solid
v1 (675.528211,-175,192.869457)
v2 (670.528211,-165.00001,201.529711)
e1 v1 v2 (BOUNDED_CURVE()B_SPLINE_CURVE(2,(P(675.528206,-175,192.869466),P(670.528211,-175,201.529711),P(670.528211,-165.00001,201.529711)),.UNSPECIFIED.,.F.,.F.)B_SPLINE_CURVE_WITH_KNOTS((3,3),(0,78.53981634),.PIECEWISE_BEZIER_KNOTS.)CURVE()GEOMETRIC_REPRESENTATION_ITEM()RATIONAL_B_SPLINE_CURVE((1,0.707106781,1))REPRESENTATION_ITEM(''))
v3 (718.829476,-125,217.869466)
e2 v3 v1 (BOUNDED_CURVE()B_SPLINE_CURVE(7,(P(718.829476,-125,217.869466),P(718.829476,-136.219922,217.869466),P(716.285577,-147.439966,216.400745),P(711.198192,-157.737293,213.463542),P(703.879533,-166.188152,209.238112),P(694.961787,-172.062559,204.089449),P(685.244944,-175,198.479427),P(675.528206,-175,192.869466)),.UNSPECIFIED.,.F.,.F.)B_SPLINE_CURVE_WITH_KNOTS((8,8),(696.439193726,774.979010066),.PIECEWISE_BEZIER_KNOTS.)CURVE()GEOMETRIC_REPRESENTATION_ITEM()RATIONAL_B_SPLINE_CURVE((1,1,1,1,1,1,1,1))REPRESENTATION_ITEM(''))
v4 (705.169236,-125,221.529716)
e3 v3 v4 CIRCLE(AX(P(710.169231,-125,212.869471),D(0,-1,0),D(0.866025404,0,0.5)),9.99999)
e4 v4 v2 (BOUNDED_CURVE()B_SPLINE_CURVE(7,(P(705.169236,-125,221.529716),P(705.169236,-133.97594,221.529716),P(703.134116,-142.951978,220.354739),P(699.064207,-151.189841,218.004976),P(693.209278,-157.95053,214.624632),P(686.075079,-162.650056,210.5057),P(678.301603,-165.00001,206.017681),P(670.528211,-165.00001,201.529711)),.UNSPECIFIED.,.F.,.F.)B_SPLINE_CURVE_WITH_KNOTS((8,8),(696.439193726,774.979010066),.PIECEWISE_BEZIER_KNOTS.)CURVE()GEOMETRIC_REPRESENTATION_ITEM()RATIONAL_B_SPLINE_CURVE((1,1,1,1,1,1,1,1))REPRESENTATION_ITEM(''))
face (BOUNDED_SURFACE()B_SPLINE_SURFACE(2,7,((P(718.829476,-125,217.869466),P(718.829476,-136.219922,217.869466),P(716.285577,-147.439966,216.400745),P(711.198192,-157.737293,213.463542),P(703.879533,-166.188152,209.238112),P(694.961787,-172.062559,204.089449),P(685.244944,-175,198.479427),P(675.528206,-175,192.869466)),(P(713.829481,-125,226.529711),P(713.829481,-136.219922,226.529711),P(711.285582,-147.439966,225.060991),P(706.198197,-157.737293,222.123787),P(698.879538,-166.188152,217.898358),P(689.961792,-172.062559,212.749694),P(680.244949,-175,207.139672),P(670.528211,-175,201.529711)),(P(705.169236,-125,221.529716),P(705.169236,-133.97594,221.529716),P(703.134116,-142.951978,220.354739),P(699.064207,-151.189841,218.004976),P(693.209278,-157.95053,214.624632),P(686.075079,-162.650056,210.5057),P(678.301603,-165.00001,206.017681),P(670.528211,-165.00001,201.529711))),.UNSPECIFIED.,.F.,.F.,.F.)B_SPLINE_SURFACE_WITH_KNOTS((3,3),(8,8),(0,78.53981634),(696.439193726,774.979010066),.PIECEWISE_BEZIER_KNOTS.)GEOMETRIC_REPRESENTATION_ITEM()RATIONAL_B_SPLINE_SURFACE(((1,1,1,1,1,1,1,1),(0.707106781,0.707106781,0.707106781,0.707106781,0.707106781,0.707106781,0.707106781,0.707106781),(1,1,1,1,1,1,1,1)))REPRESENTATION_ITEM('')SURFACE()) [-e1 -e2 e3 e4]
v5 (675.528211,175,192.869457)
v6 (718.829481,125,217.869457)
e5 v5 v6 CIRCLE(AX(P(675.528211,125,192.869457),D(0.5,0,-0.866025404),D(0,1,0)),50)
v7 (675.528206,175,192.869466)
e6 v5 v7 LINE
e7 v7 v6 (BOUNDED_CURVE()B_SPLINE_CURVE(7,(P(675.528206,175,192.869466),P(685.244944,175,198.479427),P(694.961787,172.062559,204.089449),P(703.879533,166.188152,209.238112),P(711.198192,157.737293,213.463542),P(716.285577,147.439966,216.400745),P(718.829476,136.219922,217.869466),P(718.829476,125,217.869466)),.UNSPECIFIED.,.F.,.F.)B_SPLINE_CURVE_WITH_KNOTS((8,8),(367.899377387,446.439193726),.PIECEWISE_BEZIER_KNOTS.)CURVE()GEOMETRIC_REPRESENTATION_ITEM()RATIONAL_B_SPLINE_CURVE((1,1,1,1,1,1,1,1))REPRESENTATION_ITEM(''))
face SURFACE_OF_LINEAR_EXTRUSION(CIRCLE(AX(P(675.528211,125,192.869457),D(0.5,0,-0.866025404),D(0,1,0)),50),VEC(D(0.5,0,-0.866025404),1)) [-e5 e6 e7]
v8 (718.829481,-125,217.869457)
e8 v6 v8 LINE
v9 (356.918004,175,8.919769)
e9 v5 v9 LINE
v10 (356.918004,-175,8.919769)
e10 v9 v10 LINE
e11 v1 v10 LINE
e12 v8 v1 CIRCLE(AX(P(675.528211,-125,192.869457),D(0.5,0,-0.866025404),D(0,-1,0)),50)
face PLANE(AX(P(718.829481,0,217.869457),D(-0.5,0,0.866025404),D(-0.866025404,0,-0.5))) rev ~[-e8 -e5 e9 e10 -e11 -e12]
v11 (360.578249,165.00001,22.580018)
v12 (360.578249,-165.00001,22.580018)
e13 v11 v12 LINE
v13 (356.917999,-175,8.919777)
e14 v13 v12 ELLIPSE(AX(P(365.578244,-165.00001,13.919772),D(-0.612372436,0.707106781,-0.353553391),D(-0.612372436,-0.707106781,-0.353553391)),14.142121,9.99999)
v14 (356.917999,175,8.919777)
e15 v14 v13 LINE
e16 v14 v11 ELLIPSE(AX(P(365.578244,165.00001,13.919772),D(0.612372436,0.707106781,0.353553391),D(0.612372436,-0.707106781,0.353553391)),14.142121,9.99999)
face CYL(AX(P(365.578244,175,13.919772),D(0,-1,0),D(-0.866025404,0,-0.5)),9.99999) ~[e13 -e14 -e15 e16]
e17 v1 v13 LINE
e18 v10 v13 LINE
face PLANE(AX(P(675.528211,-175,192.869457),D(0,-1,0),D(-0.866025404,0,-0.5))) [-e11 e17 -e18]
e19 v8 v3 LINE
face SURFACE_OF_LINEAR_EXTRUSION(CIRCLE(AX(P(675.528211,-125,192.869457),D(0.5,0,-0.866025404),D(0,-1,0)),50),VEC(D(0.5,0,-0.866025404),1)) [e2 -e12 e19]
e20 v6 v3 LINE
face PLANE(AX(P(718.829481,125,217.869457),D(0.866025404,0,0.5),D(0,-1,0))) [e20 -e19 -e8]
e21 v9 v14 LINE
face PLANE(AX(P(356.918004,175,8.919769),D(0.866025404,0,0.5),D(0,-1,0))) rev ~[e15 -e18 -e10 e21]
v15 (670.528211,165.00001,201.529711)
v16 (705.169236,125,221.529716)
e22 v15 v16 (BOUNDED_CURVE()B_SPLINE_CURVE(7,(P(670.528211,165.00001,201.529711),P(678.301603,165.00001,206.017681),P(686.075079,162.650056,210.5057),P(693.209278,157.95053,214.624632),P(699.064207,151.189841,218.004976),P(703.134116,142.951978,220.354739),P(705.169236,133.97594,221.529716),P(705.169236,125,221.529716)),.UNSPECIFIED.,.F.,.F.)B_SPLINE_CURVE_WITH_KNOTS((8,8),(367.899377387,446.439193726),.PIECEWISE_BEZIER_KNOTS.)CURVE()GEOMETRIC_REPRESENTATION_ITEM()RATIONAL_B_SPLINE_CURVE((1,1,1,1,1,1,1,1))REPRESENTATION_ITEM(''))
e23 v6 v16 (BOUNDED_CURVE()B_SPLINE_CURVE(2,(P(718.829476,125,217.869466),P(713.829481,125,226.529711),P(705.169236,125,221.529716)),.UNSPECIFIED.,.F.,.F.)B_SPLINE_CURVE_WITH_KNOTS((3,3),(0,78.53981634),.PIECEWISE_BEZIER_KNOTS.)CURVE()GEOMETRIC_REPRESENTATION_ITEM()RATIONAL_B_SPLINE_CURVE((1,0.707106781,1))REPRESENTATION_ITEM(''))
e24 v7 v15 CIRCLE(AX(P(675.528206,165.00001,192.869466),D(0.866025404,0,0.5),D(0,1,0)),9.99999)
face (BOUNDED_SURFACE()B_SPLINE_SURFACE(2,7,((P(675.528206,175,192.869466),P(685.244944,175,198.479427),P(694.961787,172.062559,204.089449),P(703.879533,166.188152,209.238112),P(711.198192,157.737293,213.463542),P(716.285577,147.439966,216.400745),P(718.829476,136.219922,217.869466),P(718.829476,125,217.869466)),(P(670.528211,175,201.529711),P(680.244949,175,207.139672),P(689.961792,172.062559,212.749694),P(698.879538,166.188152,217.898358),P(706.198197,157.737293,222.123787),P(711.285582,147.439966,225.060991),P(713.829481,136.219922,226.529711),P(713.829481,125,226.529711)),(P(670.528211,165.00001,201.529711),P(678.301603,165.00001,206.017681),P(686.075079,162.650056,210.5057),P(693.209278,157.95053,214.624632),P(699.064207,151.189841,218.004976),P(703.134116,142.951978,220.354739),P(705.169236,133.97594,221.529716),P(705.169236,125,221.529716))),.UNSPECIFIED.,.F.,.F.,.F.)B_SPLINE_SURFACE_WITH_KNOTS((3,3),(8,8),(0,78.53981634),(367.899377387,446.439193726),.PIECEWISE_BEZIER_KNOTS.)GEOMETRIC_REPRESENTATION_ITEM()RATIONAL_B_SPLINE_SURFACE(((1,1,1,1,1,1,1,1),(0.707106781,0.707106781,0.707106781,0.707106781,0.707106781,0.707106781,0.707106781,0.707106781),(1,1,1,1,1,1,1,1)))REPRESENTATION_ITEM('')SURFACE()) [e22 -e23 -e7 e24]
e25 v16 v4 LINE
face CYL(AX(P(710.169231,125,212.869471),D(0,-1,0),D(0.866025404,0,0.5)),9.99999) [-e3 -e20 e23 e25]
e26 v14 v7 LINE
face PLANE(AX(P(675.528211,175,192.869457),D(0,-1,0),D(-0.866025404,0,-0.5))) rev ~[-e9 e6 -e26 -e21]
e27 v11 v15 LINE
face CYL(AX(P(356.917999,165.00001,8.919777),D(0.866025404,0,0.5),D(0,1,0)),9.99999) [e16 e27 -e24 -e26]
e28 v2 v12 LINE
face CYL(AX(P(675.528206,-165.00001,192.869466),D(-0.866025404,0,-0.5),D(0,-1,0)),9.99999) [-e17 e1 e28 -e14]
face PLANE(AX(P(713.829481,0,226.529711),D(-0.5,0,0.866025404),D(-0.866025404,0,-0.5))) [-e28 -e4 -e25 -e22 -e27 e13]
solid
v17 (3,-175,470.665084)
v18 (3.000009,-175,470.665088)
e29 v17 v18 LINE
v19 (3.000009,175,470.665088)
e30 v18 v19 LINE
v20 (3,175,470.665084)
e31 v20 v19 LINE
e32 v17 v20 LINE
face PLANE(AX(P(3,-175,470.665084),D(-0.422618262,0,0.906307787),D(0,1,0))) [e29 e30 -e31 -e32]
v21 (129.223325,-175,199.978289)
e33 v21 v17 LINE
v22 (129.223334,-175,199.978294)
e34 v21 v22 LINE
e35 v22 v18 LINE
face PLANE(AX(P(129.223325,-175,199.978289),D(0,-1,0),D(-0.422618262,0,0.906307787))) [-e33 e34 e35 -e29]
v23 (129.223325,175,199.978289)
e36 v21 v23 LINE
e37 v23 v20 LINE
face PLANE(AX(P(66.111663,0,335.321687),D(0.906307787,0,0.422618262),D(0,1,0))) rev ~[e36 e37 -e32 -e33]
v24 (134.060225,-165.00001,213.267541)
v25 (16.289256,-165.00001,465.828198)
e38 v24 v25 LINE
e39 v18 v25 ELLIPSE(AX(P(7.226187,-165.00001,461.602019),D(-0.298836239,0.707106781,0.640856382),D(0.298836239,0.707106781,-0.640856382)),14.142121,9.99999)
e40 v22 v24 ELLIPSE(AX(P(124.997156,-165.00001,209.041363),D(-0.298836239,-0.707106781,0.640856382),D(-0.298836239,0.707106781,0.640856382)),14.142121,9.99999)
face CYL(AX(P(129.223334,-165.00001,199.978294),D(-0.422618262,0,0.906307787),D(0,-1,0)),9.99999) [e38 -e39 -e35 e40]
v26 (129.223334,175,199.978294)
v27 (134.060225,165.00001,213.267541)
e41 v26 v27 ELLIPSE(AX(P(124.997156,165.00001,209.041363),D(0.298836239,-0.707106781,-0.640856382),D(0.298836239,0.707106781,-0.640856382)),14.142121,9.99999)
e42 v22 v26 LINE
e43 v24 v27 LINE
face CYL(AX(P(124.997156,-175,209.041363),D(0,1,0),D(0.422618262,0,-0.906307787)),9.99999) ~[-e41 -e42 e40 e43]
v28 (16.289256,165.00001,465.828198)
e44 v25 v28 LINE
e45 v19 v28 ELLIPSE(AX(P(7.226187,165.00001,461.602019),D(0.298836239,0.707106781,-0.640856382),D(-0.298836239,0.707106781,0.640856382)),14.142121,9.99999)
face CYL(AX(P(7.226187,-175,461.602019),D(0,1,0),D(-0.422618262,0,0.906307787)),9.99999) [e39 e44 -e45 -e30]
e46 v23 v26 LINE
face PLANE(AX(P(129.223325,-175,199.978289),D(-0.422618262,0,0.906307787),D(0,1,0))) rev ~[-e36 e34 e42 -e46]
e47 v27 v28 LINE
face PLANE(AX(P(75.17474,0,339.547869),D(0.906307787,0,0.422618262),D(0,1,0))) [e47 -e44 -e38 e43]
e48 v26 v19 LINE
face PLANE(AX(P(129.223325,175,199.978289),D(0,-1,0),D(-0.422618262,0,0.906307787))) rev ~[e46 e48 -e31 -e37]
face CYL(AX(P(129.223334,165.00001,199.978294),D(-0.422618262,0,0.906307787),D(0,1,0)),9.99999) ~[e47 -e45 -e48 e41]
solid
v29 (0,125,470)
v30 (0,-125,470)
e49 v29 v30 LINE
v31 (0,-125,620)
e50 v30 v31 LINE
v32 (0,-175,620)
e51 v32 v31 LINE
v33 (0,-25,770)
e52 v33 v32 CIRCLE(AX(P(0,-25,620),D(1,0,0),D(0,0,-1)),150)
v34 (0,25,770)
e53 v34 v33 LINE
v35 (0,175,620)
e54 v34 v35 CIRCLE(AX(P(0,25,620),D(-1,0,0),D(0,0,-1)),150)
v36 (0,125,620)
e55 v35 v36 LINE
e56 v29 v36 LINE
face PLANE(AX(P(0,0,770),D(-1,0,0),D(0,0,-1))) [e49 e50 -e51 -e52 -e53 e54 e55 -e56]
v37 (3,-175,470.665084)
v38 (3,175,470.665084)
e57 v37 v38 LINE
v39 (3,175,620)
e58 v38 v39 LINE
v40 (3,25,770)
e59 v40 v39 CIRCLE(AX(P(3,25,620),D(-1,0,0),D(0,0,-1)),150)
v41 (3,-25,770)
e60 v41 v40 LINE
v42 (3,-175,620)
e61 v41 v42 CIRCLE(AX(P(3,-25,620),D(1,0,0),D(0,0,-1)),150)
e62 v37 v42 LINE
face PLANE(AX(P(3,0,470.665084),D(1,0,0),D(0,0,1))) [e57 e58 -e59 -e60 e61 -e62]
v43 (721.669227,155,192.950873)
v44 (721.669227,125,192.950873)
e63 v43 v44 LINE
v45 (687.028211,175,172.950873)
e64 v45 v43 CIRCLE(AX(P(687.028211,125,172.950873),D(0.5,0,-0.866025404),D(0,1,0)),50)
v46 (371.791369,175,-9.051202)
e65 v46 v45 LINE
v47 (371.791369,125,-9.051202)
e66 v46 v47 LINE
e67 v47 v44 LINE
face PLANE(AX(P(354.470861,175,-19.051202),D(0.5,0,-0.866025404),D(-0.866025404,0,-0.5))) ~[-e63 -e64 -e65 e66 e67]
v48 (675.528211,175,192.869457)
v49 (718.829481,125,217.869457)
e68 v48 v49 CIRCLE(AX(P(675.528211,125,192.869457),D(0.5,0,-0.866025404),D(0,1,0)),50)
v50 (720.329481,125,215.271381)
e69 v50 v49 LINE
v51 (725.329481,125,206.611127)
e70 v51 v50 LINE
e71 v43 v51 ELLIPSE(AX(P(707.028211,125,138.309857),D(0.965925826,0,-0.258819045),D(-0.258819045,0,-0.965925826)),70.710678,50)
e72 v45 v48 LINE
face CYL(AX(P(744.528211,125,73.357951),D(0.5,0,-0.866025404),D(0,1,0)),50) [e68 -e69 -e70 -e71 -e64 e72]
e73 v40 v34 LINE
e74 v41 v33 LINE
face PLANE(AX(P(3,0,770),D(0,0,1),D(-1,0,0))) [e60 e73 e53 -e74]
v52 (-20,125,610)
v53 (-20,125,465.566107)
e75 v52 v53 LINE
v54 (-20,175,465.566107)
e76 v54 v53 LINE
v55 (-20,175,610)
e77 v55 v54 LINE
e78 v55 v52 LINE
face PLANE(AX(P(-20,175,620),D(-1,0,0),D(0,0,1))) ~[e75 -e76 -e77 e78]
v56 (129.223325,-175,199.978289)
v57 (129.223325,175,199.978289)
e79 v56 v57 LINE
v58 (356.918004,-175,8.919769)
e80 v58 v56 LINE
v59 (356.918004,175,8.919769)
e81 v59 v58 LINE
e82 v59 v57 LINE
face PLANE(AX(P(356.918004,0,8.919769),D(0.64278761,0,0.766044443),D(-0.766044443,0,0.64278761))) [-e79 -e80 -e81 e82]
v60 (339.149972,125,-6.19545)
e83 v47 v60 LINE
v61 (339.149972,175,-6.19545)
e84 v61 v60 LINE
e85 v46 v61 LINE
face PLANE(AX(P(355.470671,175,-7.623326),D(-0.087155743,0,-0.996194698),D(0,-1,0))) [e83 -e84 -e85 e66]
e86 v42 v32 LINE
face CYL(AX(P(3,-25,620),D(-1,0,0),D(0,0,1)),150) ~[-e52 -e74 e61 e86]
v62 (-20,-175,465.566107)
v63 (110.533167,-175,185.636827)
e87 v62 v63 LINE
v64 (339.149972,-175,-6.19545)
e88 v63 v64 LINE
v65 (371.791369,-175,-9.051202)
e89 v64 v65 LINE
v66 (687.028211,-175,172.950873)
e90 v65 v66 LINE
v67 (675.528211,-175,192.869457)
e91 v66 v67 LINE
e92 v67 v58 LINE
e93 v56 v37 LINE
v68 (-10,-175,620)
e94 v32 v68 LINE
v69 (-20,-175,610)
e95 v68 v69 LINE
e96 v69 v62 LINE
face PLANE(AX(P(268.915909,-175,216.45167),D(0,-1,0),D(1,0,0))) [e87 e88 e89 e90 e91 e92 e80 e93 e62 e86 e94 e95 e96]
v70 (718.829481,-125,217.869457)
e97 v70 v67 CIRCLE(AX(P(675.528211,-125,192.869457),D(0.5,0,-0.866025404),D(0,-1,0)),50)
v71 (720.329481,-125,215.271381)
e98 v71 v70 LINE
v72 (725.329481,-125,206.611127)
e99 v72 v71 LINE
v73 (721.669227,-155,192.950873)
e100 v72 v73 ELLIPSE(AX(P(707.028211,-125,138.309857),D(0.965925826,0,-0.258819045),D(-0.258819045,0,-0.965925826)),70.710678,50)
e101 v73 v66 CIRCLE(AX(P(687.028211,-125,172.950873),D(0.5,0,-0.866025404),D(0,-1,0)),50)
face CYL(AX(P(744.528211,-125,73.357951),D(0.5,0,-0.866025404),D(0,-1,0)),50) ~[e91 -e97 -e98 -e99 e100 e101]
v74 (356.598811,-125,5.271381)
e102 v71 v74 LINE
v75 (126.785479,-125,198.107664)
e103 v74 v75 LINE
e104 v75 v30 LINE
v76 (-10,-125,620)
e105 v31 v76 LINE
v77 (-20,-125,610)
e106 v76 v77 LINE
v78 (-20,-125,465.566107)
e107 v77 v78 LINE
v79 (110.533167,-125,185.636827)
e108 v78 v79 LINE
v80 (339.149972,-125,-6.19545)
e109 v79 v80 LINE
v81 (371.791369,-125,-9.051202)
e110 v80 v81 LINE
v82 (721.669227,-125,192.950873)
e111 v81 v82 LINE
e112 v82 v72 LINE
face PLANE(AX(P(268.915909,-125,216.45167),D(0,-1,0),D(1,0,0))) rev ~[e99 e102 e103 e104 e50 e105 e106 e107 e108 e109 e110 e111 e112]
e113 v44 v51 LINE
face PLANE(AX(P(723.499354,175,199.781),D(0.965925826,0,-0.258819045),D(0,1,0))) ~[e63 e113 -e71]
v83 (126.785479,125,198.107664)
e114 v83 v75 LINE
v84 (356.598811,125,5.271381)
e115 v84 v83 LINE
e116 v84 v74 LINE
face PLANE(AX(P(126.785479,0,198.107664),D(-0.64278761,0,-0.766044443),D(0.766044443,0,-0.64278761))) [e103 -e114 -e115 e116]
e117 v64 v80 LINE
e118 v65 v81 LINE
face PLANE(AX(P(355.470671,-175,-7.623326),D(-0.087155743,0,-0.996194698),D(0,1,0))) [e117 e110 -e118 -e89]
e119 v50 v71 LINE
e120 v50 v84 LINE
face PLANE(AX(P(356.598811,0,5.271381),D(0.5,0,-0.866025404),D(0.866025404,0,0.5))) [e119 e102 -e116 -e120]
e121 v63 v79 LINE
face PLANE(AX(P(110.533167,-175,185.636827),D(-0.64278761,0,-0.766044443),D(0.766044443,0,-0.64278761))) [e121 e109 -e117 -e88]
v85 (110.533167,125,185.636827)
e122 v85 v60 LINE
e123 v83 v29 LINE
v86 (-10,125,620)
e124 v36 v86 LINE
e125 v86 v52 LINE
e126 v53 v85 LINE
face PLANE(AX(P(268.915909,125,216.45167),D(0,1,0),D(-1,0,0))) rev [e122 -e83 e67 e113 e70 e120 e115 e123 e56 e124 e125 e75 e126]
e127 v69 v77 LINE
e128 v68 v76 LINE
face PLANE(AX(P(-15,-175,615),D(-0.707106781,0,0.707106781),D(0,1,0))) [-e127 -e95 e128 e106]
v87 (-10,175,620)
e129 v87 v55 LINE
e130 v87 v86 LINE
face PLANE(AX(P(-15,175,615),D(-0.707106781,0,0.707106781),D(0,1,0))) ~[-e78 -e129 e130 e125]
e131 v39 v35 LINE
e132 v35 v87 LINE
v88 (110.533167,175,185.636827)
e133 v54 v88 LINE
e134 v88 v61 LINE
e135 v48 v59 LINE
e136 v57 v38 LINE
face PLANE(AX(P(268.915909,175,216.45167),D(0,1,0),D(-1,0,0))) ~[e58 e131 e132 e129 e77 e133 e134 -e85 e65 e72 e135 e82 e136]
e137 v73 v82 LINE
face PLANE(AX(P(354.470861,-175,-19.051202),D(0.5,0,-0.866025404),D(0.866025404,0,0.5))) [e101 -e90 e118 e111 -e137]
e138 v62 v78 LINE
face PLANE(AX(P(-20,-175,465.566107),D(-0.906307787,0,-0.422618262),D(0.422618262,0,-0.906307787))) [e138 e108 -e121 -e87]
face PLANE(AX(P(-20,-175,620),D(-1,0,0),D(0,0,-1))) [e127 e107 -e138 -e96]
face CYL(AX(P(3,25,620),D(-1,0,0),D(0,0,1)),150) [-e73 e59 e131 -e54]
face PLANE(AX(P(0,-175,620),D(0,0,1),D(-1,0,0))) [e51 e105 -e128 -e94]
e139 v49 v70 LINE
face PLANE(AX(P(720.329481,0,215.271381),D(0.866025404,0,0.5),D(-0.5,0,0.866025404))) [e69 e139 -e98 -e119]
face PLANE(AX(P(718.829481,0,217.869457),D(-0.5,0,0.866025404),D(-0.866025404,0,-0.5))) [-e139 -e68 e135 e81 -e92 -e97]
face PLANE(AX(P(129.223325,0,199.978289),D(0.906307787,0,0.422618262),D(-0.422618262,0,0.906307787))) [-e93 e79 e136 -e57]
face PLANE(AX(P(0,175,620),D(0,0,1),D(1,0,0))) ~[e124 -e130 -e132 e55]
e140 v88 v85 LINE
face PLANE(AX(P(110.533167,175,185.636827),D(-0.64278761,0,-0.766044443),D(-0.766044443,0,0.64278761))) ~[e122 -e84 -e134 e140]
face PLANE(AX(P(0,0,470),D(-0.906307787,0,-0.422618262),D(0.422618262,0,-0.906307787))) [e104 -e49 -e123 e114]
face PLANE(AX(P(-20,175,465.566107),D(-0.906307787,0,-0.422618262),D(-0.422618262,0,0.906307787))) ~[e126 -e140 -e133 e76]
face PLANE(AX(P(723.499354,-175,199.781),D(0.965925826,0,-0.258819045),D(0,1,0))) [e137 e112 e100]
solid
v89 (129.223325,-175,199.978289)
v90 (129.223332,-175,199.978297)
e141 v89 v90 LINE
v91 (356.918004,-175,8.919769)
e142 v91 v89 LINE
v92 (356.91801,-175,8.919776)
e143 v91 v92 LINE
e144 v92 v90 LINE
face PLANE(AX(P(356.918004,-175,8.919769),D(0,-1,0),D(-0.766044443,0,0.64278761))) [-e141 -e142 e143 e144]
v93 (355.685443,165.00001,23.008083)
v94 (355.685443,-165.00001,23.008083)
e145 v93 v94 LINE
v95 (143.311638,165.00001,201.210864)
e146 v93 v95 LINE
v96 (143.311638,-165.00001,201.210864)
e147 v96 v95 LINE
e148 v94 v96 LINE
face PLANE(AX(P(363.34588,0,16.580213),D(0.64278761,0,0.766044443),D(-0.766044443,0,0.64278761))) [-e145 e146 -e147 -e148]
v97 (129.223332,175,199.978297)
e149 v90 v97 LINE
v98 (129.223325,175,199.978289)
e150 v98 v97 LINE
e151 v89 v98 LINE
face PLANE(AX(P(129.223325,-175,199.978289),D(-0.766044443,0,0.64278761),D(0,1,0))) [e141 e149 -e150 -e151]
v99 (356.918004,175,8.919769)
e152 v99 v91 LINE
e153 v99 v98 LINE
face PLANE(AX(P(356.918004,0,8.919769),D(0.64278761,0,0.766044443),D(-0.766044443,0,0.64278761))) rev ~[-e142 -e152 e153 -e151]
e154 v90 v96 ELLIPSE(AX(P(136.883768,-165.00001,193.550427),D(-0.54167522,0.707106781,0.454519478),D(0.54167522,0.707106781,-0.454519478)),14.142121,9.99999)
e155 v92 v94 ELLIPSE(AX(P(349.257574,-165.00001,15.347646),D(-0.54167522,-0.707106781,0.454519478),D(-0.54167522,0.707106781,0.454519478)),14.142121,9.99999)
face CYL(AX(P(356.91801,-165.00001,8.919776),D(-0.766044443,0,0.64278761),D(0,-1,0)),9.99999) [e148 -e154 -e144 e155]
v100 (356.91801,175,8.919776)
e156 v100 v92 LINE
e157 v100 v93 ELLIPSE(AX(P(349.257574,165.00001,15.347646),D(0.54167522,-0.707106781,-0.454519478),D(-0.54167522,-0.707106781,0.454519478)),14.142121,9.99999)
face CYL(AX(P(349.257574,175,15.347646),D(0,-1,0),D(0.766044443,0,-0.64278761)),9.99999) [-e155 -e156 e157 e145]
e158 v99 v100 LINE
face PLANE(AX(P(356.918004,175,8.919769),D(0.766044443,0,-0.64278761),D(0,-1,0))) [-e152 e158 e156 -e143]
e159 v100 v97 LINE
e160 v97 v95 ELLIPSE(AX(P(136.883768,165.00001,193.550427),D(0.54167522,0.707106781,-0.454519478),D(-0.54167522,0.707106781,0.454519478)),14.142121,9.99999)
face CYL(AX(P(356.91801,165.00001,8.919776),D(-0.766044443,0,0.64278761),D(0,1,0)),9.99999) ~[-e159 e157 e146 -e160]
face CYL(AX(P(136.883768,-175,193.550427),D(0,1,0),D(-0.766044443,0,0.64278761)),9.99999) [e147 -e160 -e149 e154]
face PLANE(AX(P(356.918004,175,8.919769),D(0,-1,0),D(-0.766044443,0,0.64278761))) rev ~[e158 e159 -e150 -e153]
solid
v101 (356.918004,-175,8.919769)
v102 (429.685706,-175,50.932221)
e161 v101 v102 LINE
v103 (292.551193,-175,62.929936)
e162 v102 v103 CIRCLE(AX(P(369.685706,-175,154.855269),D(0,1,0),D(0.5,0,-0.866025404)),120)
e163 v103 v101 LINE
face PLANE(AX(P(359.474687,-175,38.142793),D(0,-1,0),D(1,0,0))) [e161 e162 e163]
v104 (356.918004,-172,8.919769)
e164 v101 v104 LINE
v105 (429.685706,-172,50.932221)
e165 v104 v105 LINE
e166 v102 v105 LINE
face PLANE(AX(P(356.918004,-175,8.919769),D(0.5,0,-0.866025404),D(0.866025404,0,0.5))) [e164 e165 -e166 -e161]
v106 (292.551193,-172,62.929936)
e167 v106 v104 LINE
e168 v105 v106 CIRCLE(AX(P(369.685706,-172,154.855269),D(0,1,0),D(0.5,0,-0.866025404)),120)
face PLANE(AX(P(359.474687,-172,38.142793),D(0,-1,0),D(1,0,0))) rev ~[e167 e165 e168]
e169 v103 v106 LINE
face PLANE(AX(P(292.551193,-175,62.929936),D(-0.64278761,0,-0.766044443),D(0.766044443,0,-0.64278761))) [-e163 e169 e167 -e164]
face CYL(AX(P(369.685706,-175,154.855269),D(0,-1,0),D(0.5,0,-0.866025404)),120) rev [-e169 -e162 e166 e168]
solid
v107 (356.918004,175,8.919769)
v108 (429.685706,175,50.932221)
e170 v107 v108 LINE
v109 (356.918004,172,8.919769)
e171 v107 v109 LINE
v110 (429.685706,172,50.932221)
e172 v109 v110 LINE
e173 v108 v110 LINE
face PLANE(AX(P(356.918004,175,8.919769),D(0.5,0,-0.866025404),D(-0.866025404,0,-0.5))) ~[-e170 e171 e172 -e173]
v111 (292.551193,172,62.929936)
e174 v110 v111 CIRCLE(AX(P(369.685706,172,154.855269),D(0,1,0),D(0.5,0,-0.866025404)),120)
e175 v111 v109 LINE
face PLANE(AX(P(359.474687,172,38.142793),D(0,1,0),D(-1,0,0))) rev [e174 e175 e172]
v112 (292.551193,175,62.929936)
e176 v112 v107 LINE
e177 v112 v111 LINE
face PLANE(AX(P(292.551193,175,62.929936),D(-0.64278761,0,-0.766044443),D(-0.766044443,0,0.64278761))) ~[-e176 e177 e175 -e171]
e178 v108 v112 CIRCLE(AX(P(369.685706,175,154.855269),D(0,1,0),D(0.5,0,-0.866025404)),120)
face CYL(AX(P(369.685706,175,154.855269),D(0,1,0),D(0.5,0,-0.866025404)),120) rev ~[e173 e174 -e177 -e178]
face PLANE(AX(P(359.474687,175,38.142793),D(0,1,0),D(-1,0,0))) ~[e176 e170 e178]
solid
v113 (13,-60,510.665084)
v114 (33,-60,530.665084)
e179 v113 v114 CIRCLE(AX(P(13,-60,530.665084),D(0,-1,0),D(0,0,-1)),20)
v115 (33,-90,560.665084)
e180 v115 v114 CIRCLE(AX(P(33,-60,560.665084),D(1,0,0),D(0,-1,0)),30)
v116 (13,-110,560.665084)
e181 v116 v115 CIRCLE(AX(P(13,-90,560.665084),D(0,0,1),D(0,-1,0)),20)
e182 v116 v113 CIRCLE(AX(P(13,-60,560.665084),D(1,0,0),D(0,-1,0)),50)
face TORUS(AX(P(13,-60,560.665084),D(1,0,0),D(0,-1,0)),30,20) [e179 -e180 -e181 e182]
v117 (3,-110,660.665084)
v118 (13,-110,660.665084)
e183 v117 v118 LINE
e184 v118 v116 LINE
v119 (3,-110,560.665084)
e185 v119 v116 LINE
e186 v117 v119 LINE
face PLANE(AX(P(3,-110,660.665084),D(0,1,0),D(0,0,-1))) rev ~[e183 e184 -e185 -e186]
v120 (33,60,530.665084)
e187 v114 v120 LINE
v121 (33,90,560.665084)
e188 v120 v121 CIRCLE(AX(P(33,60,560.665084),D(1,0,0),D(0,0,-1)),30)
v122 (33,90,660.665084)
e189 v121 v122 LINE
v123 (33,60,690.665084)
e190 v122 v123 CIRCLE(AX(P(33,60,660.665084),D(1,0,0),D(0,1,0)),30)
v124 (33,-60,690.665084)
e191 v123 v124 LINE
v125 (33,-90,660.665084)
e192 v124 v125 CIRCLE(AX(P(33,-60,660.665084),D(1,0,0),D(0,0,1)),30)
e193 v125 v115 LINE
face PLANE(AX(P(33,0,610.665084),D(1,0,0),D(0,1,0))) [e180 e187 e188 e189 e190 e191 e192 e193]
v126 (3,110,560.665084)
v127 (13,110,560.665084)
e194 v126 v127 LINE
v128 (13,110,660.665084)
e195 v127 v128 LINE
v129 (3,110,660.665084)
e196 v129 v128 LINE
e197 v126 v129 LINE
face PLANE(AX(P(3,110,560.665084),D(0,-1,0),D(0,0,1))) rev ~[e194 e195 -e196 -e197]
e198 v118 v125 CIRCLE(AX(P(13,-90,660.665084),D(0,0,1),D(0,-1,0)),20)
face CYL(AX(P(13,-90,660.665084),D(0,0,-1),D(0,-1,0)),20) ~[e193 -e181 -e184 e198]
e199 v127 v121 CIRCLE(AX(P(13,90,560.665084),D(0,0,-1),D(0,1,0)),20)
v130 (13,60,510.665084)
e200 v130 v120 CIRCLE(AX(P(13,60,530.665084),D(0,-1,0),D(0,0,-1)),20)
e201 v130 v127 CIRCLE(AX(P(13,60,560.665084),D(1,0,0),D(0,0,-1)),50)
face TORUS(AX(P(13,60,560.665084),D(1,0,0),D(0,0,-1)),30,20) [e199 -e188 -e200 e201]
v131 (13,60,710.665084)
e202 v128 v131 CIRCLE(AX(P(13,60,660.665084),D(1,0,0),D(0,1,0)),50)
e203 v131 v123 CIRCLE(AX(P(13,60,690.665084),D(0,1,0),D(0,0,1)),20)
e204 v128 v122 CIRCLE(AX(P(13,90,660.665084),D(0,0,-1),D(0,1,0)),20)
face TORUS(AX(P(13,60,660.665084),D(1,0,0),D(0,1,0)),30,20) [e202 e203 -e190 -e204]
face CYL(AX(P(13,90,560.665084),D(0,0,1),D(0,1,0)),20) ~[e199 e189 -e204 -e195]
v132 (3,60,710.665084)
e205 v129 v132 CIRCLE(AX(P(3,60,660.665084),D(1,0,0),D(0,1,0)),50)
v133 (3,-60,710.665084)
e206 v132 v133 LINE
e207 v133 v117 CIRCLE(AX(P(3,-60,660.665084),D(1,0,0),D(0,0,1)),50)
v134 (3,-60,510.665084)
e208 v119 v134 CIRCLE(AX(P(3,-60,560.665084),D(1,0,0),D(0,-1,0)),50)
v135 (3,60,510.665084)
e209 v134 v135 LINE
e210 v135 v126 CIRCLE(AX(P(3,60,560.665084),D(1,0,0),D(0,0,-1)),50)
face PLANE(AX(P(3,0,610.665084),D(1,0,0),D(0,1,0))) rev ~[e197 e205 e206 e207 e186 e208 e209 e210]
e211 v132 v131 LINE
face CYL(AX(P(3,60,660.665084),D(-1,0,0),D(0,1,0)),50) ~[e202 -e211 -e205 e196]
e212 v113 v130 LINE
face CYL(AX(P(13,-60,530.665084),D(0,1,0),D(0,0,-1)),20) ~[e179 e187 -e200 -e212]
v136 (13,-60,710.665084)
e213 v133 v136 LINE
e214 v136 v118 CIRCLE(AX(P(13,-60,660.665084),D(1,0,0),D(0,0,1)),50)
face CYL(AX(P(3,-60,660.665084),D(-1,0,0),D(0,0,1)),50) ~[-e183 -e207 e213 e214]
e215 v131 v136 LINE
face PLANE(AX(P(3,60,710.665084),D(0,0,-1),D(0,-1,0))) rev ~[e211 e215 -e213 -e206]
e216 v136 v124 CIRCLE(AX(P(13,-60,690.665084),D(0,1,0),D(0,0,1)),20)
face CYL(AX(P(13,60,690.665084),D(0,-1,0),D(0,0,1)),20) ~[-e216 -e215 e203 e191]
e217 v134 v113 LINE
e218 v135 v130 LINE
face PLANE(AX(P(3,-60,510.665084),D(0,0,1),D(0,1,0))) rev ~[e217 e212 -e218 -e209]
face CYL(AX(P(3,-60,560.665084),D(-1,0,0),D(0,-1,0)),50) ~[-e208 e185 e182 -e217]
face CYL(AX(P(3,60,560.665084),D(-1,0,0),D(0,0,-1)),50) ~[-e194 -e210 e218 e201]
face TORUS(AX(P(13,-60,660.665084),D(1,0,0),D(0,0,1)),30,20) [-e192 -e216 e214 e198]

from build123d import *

# Parameters (mm, degrees)
F1_DEPTH     = 175
F2_R         = 150
F4_DEPTH     = 3
F7_DEPTH     = 50
F8_SIZE      = 10
F10_T1_DEPTH = 263
F12_DEPTH    = 30
F13_R        = 20
F14_W        = 350
F14_H        = 298.6698320241
F15_DEPTH    = 10
F16_R        = 9.99999
F17_DEPTH    = 10
F18_R        = 9.99999
F19_DEPTH    = 10
F20_R        = 9.99999
F21_SIZE     = 20


# Not quite as in the source:
# - a fillet or chamfer that OpenCascade refuses, or shapes differently, is made with other operations: its cross-section is extruded or revolved along the edge and cut away or added
# - a fillet or chamfer is up to 0.001 mm smaller than in the source, because OpenCascade refuses the exact size


with BuildPart() as f1:
    # F0 (on Front) → F1 (new body, symmetric)
    with BuildSketch(Plane.XZ):
        Polygon((3, 770), (0, 770), (0, 470), (126.7854785222, 198.107663889), (356.5988114579, 5.271380983), (720.3294810474, 215.271380983), (718.8294810474, 217.8694571944), (356.9180040059, 8.9197685017), (129.2233252444, 199.9782894715), (3, 470.6650839879), align=None)
    extrude(amount=F1_DEPTH, both=True)

    # F2
    f2_edges = [f1.edges().sort_by_distance(p)[0] for p in [
        (1.5, -175, 770),
        (1.5, 175, 770),
    ]]
    fillet(f2_edges, radius=F2_R)

    # F6 (on face) → F7 (join)
    with BuildSketch(Plane.XZ.offset(175)):
        Polygon((0, 470), (0, 620), (-20, 620), (-20, 465.5661067471), (110.5331670407, 185.6368266722), (354.4708611377, -19.0512024747), (730.3294810474, 197.9508729074), (720.3294810474, 215.271380983), (356.5988114579, 5.271380983), (126.7854785222, 198.107663889), align=None)
    extrude(amount=-F7_DEPTH)

    # F8
    f8_edges = [f1.edges().sort_by_distance(p)[0] for p in [
        (-20, -150, 620),
        (730.329481, -150, 197.950873),
    ]]
    chamfer(f8_edges, length=F8_SIZE)

    # F9: F1 across plane


with BuildPart() as f4:
    # F3 (on face) → F4 (new body)
    with BuildSketch(Plane.XZ.offset(175)):
        with BuildLine():
            ThreePointArc((429.6857059273, 50.9322207943), (359.2270167975, 35.3119054774), (292.5511927649, 62.9299360741))
            Line((292.5511927649, 62.9299360741), (356.9180040059, 8.9197685017))
            Line((356.9180040059, 8.9197685017), (429.6857059273, 50.9322207943))
        make_face()
    extrude(amount=-F4_DEPTH)


with BuildPart() as f5_1:
    # F5: instance of F4
    add(f4.part.mirror(Plane.XZ))


with BuildPart() as f1_1:
    add(f1.part)
    add(f1.part.mirror(Plane.XZ))

    # F10: fillet of radius 50 on 2 edges, made by hand

    # F10_s2 → F10_t1 (cut)
    with BuildSketch(Plane(origin=(154.3671279423, 0, -267.3717086146), x_dir=(0, 1, 0), z_dir=(-0.5, 0, 0.8660254038))):
        with BuildLine():
            ThreePointArc((-175, -681.4593201734), (-160.3553390593, -716.8146592327), (-125, -731.4593201734))
            Line((-125, -731.4593201734), (-175, -731.4593201734))
            Line((-175, -731.4593201734), (-175, -681.4593201734))
        make_face()
        with BuildLine():
            ThreePointArc((175, -681.4593201734), (160.3553390593, -716.8146592327), (125, -731.4593201734))
            Line((125, -731.4593201734), (175, -731.4593201734))
            Line((175, -731.4593201734), (175, -681.4593201734))
        make_face()
    extrude(amount=F10_T1_DEPTH, mode=Mode.SUBTRACT)


with BuildPart() as f12:
    # F11 (on face) → F12 (new body)
    with BuildSketch(Plane.YZ.offset(3)):
        with BuildLine():
            Line((-60, 510.6650839879), (60, 510.6650839879))
            ThreePointArc((60, 510.6650839879), (95.3553390593, 525.3097449286), (110, 560.6650839879))
            Line((110, 560.6650839879), (110, 660.6650839879))
            ThreePointArc((110, 660.6650839879), (95.3553390593, 696.0204230473), (60, 710.6650839879))
            Line((60, 710.6650839879), (-60, 710.6650839879))
            ThreePointArc((-60, 710.6650839879), (-95.3553390593, 696.0204230473), (-110, 660.6650839879))
            Line((-110, 660.6650839879), (-110, 560.6650839879))
            ThreePointArc((-110, 560.6650839879), (-95.3553390593, 525.3097449286), (-60, 510.6650839879))
        make_face()
    extrude(amount=F12_DEPTH)

    # F13
    f13_edges = [f12.edges().sort_by_distance(p)[0] for p in [
        (33, -110, 610.665084),
        (33, -95.355339, 525.309745),
        (33, 0, 510.665084),
        (33, 95.355339, 525.309745),
        (33, 110, 610.665084),
        (33, 95.355339, 696.020423),
        (33, 0, 710.665084),
        (33, -95.355339, 696.020423),
    ]]
    fillet(f13_edges, radius=F13_R)


with BuildPart() as f15:
    # F14 (on face) → F15 (new body)
    with BuildSketch(Plane(origin=(182.7393674941, 0, 85.2127665089), x_dir=(0, 1, 0), z_dir=(0.906307787, 0, 0.4226182617))):
        with Locations((0, 275.9646599072)):
            Rectangle(F14_W, F14_H)
    extrude(amount=F15_DEPTH)

    # F16 (radius 10 in the source; OpenCascade refuses exactly that, so slightly less here)
    f16_edges = [f15.edges().sort_by_distance(p)[0] for p in [
        (138.286403, 0, 204.204472),
        (75.17474, 175, 339.547869),
        (12.063078, 0, 474.891267),
        (75.17474, -175, 339.547869),
    ]]
    fillet(f16_edges, radius=F16_R)


with BuildPart() as f17:
    # F17 (new): a face of the model
    f17_faces = [f1_1.part.faces().sort_by_distance(p)[0] for p in [
        (243.0706646252, 0, 104.4490289866),
    ]]
    extrude(f17_faces, amount=F17_DEPTH)

    # F18 (radius 10 in the source; OpenCascade refuses exactly that, so slightly less here)
    f18_edges = [f17.edges().sort_by_distance(p)[0] for p in [
        (249.498541, 175, 112.109473),
        (135.651201, 0, 207.638734),
        (249.498541, -175, 112.109473),
        (363.34588, 0, 16.580213),
    ]]
    fillet(f18_edges, radius=F18_R)


with BuildPart() as f19:
    # F19 (new): a face of the model
    f19_faces = [f1_1.part.faces().sort_by_distance(p)[0] for p in [
        (536.6079070268, 0, 112.6637823815),
    ]]
    extrude(f19_faces, amount=F19_DEPTH)

    # F20 (radius 10 in the source; OpenCascade refuses exactly that, so slightly less here)
    f20_edges = [f19.edges().sort_by_distance(p)[0] for p in [
        (701.146833, 160.355339, 219.207381),
        (713.829481, 0, 226.529711),
        (701.146833, -160.355339, 219.207381),
        (511.223107, -175, 109.554867),
        (351.918004, 0, 17.580023),
        (511.223107, 175, 109.554867),
    ]]
    fillet(f20_edges, radius=F20_R)


with BuildPart() as f1_2:
    add(f1_1.part)

    # F21
    f21_edges = [f1_2.edges().sort_by_distance(p)[0] for p in [
        (354.470861, -150, -19.051202),
        (354.470861, 150, -19.051202),
    ]]
    chamfer(f21_edges, length=F21_SIZE)


solid = Compound([f4.part, f5_1.part, f12.part, f15.part, f17.part, f19.part, f1_2.part])
